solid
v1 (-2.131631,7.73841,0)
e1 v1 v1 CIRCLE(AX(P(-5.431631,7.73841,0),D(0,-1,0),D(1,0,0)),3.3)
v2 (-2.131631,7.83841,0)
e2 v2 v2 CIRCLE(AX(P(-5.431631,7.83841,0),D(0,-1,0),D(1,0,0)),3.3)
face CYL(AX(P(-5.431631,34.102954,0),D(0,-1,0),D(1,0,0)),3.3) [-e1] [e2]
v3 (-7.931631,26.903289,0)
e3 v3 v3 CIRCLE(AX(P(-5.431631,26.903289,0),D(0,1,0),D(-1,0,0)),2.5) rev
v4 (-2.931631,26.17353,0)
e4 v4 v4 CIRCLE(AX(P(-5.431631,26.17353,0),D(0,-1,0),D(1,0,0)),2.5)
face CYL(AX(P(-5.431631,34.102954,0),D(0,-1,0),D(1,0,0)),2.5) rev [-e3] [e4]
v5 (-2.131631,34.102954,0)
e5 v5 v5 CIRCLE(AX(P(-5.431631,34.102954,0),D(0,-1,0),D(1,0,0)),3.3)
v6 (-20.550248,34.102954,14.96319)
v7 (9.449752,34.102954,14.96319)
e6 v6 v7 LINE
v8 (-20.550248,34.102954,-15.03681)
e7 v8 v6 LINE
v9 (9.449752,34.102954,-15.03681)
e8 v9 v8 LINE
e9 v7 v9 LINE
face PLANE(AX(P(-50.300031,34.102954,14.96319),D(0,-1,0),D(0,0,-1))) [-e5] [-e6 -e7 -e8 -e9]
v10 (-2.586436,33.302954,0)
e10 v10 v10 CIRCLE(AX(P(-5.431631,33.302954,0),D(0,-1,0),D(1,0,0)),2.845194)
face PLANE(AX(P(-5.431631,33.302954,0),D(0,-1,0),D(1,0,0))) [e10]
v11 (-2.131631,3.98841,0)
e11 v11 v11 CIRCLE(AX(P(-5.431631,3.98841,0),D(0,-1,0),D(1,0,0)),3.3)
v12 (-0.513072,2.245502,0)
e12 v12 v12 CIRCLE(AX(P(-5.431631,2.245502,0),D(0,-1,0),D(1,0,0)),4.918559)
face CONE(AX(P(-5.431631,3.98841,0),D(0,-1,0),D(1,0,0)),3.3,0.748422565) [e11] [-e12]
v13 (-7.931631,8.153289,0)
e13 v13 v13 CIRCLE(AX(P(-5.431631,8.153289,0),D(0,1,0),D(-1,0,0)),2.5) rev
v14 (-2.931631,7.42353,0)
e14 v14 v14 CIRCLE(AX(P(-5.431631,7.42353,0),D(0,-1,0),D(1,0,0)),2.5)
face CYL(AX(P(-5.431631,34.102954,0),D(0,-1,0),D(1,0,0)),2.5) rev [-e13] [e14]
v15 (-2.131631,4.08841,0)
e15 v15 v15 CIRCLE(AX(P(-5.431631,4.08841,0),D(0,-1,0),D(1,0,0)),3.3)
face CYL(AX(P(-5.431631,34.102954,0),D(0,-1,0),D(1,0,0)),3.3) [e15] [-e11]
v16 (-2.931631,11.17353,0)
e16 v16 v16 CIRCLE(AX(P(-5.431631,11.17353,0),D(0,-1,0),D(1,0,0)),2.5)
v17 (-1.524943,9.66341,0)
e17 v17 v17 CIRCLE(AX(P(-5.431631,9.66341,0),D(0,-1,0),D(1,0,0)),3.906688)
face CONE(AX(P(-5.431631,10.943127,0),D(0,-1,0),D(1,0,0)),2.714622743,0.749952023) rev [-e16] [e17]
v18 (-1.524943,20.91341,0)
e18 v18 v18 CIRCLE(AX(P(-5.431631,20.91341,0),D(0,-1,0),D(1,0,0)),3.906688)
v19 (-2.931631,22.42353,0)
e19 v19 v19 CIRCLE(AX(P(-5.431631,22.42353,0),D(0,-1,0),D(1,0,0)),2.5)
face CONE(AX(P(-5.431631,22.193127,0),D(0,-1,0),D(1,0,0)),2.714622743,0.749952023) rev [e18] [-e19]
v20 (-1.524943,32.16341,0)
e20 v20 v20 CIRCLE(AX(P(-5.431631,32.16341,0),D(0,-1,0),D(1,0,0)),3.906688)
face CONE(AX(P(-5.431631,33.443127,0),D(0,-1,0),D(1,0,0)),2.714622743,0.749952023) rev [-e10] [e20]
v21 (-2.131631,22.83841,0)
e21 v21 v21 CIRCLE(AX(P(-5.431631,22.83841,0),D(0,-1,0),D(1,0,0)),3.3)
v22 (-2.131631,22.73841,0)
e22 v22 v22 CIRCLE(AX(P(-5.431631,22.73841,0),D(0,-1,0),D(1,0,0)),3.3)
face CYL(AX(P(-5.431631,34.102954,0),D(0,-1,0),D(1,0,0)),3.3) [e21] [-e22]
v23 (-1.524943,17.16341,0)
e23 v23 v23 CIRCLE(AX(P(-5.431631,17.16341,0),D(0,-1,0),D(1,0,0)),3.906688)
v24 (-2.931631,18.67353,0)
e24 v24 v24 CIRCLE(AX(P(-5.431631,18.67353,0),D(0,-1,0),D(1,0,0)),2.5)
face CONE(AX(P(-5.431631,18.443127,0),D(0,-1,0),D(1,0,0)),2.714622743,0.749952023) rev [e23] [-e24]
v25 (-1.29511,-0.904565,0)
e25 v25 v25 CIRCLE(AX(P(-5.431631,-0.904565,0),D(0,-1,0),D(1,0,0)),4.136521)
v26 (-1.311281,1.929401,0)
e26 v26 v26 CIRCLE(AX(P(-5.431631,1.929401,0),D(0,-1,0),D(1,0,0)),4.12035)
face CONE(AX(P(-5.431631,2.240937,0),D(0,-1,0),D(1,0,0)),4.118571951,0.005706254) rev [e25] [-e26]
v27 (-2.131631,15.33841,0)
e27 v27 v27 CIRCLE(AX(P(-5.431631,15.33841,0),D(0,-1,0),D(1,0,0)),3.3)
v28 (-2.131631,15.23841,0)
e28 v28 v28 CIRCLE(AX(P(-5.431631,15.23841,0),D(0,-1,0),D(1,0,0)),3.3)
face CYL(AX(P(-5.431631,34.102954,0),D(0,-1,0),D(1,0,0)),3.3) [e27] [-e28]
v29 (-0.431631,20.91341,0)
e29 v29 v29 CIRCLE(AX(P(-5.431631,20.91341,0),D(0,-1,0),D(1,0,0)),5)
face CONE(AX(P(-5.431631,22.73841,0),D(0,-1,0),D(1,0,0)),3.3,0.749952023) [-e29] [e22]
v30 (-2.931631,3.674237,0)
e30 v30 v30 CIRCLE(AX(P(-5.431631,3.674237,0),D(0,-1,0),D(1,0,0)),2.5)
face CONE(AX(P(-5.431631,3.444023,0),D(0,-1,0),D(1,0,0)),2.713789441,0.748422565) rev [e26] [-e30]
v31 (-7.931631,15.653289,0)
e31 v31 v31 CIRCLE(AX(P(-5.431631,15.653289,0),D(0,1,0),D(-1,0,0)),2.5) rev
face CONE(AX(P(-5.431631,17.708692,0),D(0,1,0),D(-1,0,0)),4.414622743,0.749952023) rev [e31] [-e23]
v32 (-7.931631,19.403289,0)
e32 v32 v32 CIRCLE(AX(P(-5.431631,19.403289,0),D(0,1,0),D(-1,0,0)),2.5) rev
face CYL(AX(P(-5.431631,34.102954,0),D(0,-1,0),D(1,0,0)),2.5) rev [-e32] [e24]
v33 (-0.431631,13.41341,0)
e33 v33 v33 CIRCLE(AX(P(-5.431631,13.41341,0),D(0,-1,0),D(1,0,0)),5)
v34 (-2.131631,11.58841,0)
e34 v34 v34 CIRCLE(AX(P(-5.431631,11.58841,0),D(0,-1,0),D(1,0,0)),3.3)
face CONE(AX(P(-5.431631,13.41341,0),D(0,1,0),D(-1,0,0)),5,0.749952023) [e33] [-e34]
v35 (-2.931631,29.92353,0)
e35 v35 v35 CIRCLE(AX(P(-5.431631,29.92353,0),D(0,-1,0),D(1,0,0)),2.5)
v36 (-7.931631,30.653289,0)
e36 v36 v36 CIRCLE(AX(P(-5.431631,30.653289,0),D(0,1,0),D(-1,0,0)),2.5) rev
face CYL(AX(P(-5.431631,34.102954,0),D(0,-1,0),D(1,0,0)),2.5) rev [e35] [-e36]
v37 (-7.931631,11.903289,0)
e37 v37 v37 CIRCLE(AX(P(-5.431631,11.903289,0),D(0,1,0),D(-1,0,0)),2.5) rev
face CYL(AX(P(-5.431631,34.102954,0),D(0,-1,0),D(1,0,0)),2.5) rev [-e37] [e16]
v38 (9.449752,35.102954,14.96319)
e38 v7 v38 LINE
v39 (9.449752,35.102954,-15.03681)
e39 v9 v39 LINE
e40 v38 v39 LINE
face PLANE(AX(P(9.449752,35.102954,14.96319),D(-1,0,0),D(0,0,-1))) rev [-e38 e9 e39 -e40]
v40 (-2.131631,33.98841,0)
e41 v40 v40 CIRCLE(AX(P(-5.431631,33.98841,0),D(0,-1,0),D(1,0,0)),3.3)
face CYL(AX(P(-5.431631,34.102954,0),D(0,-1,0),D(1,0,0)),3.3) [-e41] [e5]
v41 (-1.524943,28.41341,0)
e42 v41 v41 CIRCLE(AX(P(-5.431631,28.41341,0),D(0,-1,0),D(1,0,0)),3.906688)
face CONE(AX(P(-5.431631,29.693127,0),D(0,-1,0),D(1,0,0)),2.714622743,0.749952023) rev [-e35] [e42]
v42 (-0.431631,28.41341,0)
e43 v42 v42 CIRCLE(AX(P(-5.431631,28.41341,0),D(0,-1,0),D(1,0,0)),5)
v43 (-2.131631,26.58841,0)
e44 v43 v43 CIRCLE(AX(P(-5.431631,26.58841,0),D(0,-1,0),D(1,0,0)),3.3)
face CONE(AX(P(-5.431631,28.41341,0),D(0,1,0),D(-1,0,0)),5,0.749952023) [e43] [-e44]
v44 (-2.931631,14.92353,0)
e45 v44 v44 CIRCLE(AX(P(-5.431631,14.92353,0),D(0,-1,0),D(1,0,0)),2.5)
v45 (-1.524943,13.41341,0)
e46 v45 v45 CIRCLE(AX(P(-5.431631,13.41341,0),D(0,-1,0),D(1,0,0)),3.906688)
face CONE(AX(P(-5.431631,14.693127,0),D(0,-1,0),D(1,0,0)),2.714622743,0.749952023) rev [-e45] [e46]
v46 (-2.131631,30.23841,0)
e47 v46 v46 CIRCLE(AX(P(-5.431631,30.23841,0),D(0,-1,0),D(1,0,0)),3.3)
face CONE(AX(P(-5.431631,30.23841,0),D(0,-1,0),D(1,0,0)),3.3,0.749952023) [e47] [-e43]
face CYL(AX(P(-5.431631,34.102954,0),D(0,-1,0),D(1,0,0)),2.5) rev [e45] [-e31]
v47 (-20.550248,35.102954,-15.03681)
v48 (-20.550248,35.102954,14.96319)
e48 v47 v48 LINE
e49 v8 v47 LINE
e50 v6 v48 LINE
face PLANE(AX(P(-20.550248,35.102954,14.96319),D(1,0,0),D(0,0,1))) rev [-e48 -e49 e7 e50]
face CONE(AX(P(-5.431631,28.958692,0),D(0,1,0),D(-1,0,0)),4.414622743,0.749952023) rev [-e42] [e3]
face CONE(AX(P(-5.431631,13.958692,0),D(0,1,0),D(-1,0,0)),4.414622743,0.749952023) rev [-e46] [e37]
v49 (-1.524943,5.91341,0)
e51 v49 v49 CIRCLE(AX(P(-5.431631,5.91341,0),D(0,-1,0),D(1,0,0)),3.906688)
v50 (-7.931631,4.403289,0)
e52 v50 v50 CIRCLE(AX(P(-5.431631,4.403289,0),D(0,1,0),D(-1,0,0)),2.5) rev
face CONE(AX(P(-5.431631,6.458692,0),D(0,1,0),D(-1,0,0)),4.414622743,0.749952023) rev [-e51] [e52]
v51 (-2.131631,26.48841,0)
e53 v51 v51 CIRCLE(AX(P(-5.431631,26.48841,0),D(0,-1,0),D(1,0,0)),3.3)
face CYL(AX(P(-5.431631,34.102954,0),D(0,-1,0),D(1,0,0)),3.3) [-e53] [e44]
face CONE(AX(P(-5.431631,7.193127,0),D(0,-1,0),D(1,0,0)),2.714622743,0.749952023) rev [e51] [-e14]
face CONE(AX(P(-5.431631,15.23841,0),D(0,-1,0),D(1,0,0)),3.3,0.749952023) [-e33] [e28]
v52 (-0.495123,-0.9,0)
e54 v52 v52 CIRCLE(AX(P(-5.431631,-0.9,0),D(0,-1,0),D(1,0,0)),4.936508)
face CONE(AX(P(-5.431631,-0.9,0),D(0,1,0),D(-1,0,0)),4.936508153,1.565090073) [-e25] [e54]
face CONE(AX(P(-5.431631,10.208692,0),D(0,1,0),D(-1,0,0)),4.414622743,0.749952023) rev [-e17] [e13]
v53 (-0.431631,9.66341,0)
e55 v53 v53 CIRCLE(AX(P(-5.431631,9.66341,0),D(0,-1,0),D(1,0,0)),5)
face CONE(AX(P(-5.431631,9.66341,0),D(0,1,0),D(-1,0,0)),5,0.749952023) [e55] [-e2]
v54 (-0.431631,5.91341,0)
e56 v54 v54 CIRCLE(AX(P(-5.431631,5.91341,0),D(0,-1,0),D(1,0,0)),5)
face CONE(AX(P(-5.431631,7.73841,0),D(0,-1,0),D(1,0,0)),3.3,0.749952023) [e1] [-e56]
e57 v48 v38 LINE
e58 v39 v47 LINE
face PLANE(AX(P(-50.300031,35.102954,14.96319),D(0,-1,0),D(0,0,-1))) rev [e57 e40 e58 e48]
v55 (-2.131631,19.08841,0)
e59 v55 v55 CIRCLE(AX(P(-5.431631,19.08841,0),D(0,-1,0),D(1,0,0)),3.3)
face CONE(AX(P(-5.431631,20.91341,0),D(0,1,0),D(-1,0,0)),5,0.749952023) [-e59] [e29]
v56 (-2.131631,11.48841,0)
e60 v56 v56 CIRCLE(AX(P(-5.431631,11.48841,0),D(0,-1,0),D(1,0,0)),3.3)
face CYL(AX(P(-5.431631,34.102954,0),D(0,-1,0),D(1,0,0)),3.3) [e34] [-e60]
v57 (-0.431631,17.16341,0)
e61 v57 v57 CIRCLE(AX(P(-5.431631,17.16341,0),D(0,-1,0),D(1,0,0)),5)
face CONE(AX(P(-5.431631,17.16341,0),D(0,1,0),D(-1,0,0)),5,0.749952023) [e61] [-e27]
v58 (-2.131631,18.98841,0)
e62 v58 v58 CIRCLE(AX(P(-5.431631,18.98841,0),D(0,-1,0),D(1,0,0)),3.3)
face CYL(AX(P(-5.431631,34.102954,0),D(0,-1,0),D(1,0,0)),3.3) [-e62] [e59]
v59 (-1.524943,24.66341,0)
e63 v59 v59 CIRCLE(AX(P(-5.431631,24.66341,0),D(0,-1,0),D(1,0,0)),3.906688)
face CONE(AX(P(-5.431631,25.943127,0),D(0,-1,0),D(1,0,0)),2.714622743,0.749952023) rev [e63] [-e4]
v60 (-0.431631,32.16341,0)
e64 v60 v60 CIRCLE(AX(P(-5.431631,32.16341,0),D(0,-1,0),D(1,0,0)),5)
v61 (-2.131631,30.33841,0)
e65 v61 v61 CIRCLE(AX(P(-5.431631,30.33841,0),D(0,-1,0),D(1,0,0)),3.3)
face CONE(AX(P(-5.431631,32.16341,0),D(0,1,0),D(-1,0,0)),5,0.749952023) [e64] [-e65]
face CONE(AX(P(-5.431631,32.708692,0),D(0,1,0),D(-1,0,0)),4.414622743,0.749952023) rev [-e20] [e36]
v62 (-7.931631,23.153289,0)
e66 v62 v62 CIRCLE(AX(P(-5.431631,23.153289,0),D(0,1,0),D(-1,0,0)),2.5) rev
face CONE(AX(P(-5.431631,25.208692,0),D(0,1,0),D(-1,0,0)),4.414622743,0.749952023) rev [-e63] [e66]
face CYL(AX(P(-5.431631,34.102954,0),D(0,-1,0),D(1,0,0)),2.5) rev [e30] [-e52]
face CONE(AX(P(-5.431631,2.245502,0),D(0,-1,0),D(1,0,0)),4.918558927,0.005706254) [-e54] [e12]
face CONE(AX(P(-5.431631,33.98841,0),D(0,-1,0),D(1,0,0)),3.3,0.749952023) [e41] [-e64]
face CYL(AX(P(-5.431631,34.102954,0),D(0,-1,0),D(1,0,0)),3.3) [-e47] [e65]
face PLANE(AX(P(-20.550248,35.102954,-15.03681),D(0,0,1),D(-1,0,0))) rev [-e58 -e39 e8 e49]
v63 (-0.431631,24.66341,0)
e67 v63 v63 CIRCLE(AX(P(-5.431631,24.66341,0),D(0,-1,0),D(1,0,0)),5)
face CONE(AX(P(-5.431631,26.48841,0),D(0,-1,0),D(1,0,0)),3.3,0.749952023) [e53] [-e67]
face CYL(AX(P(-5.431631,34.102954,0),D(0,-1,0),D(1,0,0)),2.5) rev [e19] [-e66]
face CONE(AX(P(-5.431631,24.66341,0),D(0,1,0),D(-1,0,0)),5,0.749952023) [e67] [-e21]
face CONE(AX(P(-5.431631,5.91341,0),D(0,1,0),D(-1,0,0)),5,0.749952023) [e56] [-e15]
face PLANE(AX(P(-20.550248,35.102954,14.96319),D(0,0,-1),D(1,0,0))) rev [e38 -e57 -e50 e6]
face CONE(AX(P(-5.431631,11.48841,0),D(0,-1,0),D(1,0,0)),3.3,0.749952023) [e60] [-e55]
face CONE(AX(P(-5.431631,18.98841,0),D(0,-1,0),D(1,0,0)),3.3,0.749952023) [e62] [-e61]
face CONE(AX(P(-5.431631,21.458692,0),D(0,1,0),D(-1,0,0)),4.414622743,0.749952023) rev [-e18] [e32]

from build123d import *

# Parameters (mm, degrees)
SKETCH7_W                   = 30
SKETCH7_H                   = 30
THICKEN5_T2                 = 1
BODY_MOVE_COPY5_START       = 35.102954004
BODY_MOVE_COPY5_OUTLINE_W   = 30
BODY_MOVE_COPY5_OUTLINE_H   = 30
BODY_MOVE_COPY5_DEPTH       = 0.011205152
BODY_MOVE_COPY5_START_2     = 34.102954004
BODY_MOVE_COPY5_2_OUTLINE_W = 30
BODY_MOVE_COPY5_2_OUTLINE_H = 30
BODY_MOVE_COPY5_2_DEPTH     = 0.011205152


# Read off the part's stored shape, not the designer's step: Thicken1, Body-Move/Copy5
with BuildPart() as part:
    # Thicken1 outline → Thicken1 (revolve)
    with BuildSketch(Plane(origin=(-5.431630681, 0, 0), x_dir=(1, 0, 0), z_dir=(0, 0, 1))):
        Polygon((4.120349674, 1.929400611), (4.136521177, -0.904564978), (4.936508153, -0.9), (4.918558927, 2.245501685), (3.3, 3.988409531), (3.3, 4.088409531), (5, 5.913409531), (3.3, 7.738409531), (3.3, 7.838409531), (5, 9.663409531), (3.3, 11.488409531), (3.3, 11.588409531), (5, 13.413409531), (3.3, 15.238409531), (3.3, 15.338409531), (5, 17.163409531), (3.3, 18.988409531), (3.3, 19.088409531), (5, 20.913409531), (3.3, 22.738409531), (3.3, 22.838409531), (5, 24.663409531), (3.3, 26.488409531), (3.3, 26.588409531), (5, 28.413409531), (3.3, 30.238409531), (3.3, 30.338409531), (5, 32.163409531), (3.3, 33.988409531), (3.3, 34.102954004), (0, 34.102954004), (0, 33.302954004), (2.845194483, 33.302954004), (3.906687965, 32.163409531), (2.5, 30.653288628), (2.5, 29.923530434), (3.906687965, 28.413409531), (2.5, 26.903288628), (2.5, 26.173530434), (3.906687965, 24.663409531), (2.5, 23.153288628), (2.5, 22.423530434), (3.906687965, 20.913409531), (2.5, 19.403288628), (2.5, 18.673530434), (3.906687965, 17.163409531), (2.5, 15.653288628), (2.5, 14.923530434), (3.906687965, 13.413409531), (2.5, 11.903288628), (2.5, 11.173530434), (3.906687965, 9.663409531), (2.5, 8.153288628), (2.5, 7.423530434), (3.906687965, 5.913409531), (2.5, 4.403288628), (2.5, 3.674236782), align=None)
    revolve(axis=Axis((-5.431630681, 0, 0), (0, 1, 0)))


with BuildPart() as body_2:
    # Sketch7 → Surface-Plane3: a flat surface bounded by the sketch
    with BuildSketch(Plane(origin=(0, 0, 0), x_dir=(1, 0, 0), z_dir=(0, 1, 0)), mode=Mode.PRIVATE) as surface_plane3_1_region:
        with Locations((44.749783052, 15)):
            Rectangle(SKETCH7_W, SKETCH7_H)
    surface_plane3_1 = surface_plane3_1_region.sketch.faces()[0]
    add(Solid.thicken(surface_plane3_1, -THICKEN5_T2))


with BuildPart() as body_2_1:
    # Body-Move/Copy3: moved
    add(body_2.part.moved(Location((-50.300030874, 35.114159156, 14.96319027))))

    # Body-Move/Copy5 outline → Body-Move/Copy5 (cut)
    with BuildSketch(Plane(origin=(0, 0, 0), x_dir=(1, 0, 0), z_dir=(0, 1, 0)).offset(BODY_MOVE_COPY5_START)):
        with Locations((-5.550247822, 0.03680973)):
            Rectangle(BODY_MOVE_COPY5_OUTLINE_W, BODY_MOVE_COPY5_OUTLINE_H)
    extrude(amount=BODY_MOVE_COPY5_DEPTH, mode=Mode.SUBTRACT)

    # Body-Move_Copy5 2 outline → Body-Move_Copy5 2 (add)
    with BuildSketch(Plane(origin=(0, 0, 0), x_dir=(1, 0, 0), z_dir=(0, 1, 0)).offset(BODY_MOVE_COPY5_START_2)):
        with Locations((-5.550247822, 0.03680973)):
            Rectangle(BODY_MOVE_COPY5_2_OUTLINE_W, BODY_MOVE_COPY5_2_OUTLINE_H)
    extrude(amount=BODY_MOVE_COPY5_2_DEPTH)

    # Combine1: union part
    add(part.part)


solid = body_2_1.part
